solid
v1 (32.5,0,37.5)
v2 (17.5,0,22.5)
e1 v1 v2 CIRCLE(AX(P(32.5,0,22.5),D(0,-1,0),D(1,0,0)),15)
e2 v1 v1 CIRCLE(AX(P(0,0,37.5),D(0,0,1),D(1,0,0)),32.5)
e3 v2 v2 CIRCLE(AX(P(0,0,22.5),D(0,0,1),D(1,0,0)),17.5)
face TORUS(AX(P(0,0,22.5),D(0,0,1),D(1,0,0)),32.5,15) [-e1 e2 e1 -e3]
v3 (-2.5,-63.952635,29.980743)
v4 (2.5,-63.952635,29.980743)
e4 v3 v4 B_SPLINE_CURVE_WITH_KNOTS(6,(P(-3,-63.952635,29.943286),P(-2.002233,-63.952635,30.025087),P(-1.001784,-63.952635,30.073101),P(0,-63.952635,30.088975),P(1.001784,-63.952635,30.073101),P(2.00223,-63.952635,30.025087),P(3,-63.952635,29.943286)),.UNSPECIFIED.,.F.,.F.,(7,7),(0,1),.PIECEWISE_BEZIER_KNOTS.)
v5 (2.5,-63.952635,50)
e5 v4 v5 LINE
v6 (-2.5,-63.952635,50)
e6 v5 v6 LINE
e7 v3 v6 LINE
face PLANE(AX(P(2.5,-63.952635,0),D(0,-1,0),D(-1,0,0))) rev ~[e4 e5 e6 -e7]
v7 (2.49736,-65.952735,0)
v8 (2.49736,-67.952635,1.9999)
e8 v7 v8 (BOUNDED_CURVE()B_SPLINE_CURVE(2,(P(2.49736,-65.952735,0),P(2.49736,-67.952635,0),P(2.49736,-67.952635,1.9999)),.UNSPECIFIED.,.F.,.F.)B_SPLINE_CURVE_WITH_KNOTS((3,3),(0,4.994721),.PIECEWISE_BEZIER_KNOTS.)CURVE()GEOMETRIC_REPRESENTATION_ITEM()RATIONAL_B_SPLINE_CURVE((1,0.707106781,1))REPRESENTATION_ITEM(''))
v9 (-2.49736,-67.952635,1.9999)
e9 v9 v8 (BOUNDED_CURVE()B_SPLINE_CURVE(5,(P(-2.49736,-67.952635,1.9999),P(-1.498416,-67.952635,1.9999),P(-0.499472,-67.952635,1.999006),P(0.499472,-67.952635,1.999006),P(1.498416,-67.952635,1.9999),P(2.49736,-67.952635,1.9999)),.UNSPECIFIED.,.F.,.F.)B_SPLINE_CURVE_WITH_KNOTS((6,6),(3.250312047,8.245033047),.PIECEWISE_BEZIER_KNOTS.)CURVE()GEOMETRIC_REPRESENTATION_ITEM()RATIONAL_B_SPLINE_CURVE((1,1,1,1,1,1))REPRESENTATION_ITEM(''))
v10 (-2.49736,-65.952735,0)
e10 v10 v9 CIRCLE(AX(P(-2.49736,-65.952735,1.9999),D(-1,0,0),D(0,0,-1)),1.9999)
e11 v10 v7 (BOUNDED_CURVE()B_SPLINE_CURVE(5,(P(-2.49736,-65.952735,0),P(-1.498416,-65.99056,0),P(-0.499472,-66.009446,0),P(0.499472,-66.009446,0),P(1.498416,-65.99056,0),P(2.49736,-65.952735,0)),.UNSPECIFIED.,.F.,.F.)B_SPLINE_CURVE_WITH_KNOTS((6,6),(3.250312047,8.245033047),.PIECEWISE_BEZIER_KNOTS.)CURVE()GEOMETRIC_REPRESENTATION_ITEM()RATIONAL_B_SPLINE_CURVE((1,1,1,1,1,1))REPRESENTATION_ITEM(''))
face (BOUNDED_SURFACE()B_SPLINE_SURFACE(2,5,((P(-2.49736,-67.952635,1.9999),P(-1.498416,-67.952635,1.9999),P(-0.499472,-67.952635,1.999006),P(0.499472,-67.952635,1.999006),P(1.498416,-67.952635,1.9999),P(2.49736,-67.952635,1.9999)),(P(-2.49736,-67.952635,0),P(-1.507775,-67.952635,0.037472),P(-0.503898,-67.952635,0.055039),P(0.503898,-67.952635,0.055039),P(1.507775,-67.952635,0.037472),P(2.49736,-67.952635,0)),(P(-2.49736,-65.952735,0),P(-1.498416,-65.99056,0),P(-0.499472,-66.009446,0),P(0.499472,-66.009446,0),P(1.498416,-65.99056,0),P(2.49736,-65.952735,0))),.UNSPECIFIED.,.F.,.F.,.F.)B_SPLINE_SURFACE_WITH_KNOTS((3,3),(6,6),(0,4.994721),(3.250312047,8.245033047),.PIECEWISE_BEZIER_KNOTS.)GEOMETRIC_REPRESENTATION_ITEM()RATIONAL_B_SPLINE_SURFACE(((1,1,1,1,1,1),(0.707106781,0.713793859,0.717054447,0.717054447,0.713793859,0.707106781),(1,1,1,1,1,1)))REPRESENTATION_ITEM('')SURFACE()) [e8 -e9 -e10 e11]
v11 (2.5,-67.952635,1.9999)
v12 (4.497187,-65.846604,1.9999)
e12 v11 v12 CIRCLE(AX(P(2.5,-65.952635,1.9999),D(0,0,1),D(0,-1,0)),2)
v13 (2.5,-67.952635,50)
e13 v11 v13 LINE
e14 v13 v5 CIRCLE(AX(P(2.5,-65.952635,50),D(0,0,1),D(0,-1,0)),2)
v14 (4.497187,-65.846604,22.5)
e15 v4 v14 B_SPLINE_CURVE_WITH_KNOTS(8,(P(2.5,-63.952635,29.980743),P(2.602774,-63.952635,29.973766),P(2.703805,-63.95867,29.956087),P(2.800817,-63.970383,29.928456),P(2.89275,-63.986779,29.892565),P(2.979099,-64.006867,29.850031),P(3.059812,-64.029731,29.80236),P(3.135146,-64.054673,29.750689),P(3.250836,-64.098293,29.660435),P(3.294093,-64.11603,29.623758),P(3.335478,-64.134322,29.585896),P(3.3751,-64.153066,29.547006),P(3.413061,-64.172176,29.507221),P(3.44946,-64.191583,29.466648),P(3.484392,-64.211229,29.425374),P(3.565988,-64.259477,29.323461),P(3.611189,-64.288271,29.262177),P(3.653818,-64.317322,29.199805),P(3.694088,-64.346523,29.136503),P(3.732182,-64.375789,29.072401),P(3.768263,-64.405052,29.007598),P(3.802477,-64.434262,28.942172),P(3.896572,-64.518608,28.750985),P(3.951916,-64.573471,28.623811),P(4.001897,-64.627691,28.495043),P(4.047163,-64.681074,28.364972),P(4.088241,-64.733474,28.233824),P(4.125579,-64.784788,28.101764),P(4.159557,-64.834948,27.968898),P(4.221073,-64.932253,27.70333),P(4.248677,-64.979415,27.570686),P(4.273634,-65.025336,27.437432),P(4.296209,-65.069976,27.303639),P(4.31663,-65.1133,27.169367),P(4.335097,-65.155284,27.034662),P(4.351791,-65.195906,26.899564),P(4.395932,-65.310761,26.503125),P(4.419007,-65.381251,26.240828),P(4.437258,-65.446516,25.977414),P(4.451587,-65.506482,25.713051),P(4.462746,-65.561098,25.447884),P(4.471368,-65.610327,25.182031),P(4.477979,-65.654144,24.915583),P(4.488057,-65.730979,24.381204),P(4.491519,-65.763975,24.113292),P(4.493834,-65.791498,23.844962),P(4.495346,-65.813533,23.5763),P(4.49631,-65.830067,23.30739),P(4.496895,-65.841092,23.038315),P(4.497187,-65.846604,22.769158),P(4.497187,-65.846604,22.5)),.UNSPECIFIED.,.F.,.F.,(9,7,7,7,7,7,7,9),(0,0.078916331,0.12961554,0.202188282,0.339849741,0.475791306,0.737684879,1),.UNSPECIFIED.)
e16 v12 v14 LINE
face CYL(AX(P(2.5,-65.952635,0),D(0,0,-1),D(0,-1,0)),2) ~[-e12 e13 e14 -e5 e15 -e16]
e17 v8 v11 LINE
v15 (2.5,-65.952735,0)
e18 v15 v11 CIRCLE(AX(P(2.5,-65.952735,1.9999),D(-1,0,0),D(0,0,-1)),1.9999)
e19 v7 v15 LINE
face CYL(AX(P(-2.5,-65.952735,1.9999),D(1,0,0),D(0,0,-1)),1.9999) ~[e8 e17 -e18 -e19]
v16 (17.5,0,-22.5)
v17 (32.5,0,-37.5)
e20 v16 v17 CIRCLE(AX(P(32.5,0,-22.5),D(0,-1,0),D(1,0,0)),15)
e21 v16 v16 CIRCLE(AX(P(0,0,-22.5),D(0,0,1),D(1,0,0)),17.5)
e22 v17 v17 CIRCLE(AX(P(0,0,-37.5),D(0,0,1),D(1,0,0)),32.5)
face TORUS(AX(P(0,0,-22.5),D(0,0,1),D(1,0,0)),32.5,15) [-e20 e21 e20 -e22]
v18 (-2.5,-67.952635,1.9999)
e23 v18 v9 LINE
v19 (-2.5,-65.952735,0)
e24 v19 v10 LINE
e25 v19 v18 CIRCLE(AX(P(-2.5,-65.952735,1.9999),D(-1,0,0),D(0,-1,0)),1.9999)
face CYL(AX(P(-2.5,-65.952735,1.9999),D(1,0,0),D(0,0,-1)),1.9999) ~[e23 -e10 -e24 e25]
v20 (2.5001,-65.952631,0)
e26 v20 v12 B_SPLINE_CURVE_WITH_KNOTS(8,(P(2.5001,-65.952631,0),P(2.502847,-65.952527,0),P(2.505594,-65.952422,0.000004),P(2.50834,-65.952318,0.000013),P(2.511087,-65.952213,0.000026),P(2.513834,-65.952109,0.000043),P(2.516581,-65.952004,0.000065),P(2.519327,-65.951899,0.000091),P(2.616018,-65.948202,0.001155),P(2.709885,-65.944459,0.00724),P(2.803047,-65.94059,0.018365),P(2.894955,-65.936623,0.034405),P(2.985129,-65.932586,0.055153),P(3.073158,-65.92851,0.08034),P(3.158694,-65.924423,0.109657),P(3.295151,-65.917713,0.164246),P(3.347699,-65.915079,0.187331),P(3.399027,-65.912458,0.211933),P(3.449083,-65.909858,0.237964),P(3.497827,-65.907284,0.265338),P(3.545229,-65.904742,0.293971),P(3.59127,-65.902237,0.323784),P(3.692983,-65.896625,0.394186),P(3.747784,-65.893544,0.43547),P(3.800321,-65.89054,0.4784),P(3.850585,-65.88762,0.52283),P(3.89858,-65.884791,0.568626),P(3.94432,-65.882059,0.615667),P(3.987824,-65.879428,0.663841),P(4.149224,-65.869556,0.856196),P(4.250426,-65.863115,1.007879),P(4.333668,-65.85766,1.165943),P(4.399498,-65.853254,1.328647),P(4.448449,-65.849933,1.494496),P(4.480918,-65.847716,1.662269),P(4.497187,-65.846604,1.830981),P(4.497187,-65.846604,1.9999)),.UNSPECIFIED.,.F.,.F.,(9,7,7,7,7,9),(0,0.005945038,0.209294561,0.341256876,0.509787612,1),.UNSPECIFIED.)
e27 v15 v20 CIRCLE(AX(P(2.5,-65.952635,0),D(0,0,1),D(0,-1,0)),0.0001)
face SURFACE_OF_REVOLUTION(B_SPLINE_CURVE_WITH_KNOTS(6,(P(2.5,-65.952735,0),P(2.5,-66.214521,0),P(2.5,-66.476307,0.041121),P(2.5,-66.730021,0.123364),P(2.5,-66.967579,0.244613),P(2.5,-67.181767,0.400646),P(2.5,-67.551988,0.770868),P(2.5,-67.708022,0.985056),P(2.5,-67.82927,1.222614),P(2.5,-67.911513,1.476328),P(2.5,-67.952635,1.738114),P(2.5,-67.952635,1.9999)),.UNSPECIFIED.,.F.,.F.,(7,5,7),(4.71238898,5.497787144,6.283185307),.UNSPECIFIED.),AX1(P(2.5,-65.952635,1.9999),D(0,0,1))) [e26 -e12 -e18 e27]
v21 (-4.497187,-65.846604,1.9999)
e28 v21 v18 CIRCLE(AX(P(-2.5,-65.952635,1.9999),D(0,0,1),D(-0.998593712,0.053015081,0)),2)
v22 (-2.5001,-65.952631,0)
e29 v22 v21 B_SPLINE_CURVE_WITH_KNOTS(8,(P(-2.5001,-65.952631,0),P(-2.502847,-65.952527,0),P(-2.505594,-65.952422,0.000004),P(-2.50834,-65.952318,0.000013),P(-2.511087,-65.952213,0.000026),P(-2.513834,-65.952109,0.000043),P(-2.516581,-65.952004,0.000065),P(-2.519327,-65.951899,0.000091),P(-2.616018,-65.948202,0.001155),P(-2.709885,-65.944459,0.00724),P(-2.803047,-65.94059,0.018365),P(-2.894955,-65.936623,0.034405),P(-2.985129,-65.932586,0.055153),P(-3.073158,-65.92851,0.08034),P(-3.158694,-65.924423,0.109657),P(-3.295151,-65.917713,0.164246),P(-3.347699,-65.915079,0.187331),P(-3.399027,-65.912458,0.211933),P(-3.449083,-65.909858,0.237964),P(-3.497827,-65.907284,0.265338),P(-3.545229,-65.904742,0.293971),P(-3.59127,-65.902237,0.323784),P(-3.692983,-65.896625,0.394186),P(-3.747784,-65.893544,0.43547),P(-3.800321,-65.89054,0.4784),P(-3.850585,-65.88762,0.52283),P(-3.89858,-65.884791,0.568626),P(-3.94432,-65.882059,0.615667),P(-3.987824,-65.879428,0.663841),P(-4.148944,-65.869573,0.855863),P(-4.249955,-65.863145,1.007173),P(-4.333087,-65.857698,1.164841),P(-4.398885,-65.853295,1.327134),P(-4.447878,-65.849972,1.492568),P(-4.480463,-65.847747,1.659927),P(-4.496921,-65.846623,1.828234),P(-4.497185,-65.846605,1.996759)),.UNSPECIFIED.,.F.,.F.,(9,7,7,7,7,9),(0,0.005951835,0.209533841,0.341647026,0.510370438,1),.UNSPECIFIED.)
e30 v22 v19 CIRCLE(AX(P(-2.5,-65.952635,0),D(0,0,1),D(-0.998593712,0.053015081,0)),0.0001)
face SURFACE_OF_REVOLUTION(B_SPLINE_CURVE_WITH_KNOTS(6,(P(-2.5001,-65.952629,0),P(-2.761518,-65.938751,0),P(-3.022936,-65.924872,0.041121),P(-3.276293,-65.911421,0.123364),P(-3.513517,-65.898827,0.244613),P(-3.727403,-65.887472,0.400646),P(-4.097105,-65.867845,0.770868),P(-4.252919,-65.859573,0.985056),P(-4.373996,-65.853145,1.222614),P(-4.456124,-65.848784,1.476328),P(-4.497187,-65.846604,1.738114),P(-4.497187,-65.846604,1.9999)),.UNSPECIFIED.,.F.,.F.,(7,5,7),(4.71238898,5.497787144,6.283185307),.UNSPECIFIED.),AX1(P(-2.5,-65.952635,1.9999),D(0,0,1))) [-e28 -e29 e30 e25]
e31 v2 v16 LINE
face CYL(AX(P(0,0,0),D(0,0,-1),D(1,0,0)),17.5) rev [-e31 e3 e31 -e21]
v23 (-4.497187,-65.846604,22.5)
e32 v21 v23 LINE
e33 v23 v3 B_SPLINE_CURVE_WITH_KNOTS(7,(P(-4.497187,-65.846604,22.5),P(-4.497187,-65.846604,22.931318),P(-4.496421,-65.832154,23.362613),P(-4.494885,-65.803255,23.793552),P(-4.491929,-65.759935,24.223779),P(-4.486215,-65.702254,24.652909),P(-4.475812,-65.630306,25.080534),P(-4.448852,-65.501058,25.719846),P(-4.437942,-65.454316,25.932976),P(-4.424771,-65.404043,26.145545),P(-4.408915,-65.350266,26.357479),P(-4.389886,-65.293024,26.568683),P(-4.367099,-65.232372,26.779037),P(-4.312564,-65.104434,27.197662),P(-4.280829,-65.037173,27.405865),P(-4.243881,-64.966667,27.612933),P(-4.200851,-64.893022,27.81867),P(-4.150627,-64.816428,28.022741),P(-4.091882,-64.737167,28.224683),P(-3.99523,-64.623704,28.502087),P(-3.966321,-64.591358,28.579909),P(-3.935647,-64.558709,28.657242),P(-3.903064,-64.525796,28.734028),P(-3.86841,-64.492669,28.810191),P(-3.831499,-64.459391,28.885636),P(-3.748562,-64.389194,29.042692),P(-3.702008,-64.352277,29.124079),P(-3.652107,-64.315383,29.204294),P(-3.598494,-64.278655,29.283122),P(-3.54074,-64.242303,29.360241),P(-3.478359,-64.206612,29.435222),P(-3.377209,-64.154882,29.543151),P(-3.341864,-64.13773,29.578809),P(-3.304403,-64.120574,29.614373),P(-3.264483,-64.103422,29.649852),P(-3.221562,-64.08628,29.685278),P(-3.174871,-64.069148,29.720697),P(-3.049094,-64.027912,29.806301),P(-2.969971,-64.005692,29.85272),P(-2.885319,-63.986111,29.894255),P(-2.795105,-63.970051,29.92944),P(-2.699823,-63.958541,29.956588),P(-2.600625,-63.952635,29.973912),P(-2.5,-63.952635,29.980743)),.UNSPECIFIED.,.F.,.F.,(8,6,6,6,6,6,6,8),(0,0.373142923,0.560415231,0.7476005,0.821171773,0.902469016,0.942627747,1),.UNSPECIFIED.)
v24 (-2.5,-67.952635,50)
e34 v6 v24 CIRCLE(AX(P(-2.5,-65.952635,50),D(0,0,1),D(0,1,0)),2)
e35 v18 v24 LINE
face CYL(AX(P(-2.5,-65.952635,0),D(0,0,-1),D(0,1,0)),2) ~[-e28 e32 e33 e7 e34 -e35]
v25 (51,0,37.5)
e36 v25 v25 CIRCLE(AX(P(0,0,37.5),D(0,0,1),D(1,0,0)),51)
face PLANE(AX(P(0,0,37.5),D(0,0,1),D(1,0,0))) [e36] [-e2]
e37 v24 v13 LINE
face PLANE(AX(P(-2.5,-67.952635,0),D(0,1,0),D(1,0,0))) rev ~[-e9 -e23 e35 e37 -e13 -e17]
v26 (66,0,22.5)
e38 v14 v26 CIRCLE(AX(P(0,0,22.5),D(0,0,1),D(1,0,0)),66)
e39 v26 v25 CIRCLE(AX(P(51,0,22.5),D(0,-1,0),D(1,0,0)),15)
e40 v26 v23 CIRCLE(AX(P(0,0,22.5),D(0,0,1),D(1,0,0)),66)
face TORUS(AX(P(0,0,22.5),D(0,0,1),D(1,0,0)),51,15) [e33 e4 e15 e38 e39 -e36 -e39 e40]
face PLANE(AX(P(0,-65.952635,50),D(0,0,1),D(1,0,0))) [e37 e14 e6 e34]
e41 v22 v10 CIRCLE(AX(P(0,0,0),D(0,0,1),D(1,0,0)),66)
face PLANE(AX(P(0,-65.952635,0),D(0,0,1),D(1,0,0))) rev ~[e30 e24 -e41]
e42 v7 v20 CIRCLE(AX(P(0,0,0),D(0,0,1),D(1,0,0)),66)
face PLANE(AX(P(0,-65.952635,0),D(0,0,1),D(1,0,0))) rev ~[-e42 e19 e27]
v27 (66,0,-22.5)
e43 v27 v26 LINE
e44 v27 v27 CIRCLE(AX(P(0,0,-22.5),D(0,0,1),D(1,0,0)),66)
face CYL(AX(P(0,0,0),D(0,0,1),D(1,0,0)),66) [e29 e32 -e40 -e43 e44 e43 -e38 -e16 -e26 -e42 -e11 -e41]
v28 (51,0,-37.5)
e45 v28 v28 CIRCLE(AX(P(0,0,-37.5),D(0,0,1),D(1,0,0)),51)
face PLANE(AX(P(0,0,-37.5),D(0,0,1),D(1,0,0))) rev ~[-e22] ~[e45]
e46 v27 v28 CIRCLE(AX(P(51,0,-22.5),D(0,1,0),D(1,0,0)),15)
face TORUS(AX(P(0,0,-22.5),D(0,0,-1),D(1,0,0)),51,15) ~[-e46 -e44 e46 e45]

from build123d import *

# Parameters (mm, degrees)
F0_R     = 66
F0_R_2   = 17.5
F1_DEPTH = 37.5
F2_R     = 15
F4_DEPTH = 50
F5_R     = 1.9999


# Not quite as in the source:
# - a fillet or chamfer is up to 0.001 mm smaller than in the source, because OpenCascade refuses the exact size


with BuildPart() as f1:
    # F0 (on Top) → F1 (new body, symmetric)
    with BuildSketch(Plane.XY):
        Circle(F0_R)
        Circle(F0_R_2, mode=Mode.SUBTRACT)
    extrude(amount=F1_DEPTH, both=True)

    # F2
    f2_edges = [f1.edges().sort_by_distance(p)[0] for p in [
        (-17.5, 0, 37.5),
        (17.5, 0, 0),
        (-17.5, 0, -37.5),
        (-66, 0, -37.5),
        (66, 0, 0),
        (-66, 0, 37.5),
    ]]
    fillet(f2_edges, radius=F2_R)

    # F3 (on Top) → F4 (join)
    with BuildSketch(Plane.XY):
        with BuildLine():
            Line((2.5, -63.952634519), (-2.5, -63.952634519))
            ThreePointArc((-2.5, -63.952634519), (-4.5, -65.952634519), (-2.5, -67.952634519))
            Line((-2.5, -67.952634519), (2.5, -67.952634519))
            ThreePointArc((2.5, -67.952634519), (4.5, -65.952634519), (2.5, -63.952634519))
        make_face()
    extrude(amount=F4_DEPTH)

    # F5 (radius 2 in the source; OpenCascade refuses exactly that, so slightly less here)
    f5_edges = [f1.edges().sort_by_distance(p)[0] for p in [
        (0, -67.952635, 0),
    ]]
    fillet(f5_edges, radius=F5_R)


solid = f1.part
